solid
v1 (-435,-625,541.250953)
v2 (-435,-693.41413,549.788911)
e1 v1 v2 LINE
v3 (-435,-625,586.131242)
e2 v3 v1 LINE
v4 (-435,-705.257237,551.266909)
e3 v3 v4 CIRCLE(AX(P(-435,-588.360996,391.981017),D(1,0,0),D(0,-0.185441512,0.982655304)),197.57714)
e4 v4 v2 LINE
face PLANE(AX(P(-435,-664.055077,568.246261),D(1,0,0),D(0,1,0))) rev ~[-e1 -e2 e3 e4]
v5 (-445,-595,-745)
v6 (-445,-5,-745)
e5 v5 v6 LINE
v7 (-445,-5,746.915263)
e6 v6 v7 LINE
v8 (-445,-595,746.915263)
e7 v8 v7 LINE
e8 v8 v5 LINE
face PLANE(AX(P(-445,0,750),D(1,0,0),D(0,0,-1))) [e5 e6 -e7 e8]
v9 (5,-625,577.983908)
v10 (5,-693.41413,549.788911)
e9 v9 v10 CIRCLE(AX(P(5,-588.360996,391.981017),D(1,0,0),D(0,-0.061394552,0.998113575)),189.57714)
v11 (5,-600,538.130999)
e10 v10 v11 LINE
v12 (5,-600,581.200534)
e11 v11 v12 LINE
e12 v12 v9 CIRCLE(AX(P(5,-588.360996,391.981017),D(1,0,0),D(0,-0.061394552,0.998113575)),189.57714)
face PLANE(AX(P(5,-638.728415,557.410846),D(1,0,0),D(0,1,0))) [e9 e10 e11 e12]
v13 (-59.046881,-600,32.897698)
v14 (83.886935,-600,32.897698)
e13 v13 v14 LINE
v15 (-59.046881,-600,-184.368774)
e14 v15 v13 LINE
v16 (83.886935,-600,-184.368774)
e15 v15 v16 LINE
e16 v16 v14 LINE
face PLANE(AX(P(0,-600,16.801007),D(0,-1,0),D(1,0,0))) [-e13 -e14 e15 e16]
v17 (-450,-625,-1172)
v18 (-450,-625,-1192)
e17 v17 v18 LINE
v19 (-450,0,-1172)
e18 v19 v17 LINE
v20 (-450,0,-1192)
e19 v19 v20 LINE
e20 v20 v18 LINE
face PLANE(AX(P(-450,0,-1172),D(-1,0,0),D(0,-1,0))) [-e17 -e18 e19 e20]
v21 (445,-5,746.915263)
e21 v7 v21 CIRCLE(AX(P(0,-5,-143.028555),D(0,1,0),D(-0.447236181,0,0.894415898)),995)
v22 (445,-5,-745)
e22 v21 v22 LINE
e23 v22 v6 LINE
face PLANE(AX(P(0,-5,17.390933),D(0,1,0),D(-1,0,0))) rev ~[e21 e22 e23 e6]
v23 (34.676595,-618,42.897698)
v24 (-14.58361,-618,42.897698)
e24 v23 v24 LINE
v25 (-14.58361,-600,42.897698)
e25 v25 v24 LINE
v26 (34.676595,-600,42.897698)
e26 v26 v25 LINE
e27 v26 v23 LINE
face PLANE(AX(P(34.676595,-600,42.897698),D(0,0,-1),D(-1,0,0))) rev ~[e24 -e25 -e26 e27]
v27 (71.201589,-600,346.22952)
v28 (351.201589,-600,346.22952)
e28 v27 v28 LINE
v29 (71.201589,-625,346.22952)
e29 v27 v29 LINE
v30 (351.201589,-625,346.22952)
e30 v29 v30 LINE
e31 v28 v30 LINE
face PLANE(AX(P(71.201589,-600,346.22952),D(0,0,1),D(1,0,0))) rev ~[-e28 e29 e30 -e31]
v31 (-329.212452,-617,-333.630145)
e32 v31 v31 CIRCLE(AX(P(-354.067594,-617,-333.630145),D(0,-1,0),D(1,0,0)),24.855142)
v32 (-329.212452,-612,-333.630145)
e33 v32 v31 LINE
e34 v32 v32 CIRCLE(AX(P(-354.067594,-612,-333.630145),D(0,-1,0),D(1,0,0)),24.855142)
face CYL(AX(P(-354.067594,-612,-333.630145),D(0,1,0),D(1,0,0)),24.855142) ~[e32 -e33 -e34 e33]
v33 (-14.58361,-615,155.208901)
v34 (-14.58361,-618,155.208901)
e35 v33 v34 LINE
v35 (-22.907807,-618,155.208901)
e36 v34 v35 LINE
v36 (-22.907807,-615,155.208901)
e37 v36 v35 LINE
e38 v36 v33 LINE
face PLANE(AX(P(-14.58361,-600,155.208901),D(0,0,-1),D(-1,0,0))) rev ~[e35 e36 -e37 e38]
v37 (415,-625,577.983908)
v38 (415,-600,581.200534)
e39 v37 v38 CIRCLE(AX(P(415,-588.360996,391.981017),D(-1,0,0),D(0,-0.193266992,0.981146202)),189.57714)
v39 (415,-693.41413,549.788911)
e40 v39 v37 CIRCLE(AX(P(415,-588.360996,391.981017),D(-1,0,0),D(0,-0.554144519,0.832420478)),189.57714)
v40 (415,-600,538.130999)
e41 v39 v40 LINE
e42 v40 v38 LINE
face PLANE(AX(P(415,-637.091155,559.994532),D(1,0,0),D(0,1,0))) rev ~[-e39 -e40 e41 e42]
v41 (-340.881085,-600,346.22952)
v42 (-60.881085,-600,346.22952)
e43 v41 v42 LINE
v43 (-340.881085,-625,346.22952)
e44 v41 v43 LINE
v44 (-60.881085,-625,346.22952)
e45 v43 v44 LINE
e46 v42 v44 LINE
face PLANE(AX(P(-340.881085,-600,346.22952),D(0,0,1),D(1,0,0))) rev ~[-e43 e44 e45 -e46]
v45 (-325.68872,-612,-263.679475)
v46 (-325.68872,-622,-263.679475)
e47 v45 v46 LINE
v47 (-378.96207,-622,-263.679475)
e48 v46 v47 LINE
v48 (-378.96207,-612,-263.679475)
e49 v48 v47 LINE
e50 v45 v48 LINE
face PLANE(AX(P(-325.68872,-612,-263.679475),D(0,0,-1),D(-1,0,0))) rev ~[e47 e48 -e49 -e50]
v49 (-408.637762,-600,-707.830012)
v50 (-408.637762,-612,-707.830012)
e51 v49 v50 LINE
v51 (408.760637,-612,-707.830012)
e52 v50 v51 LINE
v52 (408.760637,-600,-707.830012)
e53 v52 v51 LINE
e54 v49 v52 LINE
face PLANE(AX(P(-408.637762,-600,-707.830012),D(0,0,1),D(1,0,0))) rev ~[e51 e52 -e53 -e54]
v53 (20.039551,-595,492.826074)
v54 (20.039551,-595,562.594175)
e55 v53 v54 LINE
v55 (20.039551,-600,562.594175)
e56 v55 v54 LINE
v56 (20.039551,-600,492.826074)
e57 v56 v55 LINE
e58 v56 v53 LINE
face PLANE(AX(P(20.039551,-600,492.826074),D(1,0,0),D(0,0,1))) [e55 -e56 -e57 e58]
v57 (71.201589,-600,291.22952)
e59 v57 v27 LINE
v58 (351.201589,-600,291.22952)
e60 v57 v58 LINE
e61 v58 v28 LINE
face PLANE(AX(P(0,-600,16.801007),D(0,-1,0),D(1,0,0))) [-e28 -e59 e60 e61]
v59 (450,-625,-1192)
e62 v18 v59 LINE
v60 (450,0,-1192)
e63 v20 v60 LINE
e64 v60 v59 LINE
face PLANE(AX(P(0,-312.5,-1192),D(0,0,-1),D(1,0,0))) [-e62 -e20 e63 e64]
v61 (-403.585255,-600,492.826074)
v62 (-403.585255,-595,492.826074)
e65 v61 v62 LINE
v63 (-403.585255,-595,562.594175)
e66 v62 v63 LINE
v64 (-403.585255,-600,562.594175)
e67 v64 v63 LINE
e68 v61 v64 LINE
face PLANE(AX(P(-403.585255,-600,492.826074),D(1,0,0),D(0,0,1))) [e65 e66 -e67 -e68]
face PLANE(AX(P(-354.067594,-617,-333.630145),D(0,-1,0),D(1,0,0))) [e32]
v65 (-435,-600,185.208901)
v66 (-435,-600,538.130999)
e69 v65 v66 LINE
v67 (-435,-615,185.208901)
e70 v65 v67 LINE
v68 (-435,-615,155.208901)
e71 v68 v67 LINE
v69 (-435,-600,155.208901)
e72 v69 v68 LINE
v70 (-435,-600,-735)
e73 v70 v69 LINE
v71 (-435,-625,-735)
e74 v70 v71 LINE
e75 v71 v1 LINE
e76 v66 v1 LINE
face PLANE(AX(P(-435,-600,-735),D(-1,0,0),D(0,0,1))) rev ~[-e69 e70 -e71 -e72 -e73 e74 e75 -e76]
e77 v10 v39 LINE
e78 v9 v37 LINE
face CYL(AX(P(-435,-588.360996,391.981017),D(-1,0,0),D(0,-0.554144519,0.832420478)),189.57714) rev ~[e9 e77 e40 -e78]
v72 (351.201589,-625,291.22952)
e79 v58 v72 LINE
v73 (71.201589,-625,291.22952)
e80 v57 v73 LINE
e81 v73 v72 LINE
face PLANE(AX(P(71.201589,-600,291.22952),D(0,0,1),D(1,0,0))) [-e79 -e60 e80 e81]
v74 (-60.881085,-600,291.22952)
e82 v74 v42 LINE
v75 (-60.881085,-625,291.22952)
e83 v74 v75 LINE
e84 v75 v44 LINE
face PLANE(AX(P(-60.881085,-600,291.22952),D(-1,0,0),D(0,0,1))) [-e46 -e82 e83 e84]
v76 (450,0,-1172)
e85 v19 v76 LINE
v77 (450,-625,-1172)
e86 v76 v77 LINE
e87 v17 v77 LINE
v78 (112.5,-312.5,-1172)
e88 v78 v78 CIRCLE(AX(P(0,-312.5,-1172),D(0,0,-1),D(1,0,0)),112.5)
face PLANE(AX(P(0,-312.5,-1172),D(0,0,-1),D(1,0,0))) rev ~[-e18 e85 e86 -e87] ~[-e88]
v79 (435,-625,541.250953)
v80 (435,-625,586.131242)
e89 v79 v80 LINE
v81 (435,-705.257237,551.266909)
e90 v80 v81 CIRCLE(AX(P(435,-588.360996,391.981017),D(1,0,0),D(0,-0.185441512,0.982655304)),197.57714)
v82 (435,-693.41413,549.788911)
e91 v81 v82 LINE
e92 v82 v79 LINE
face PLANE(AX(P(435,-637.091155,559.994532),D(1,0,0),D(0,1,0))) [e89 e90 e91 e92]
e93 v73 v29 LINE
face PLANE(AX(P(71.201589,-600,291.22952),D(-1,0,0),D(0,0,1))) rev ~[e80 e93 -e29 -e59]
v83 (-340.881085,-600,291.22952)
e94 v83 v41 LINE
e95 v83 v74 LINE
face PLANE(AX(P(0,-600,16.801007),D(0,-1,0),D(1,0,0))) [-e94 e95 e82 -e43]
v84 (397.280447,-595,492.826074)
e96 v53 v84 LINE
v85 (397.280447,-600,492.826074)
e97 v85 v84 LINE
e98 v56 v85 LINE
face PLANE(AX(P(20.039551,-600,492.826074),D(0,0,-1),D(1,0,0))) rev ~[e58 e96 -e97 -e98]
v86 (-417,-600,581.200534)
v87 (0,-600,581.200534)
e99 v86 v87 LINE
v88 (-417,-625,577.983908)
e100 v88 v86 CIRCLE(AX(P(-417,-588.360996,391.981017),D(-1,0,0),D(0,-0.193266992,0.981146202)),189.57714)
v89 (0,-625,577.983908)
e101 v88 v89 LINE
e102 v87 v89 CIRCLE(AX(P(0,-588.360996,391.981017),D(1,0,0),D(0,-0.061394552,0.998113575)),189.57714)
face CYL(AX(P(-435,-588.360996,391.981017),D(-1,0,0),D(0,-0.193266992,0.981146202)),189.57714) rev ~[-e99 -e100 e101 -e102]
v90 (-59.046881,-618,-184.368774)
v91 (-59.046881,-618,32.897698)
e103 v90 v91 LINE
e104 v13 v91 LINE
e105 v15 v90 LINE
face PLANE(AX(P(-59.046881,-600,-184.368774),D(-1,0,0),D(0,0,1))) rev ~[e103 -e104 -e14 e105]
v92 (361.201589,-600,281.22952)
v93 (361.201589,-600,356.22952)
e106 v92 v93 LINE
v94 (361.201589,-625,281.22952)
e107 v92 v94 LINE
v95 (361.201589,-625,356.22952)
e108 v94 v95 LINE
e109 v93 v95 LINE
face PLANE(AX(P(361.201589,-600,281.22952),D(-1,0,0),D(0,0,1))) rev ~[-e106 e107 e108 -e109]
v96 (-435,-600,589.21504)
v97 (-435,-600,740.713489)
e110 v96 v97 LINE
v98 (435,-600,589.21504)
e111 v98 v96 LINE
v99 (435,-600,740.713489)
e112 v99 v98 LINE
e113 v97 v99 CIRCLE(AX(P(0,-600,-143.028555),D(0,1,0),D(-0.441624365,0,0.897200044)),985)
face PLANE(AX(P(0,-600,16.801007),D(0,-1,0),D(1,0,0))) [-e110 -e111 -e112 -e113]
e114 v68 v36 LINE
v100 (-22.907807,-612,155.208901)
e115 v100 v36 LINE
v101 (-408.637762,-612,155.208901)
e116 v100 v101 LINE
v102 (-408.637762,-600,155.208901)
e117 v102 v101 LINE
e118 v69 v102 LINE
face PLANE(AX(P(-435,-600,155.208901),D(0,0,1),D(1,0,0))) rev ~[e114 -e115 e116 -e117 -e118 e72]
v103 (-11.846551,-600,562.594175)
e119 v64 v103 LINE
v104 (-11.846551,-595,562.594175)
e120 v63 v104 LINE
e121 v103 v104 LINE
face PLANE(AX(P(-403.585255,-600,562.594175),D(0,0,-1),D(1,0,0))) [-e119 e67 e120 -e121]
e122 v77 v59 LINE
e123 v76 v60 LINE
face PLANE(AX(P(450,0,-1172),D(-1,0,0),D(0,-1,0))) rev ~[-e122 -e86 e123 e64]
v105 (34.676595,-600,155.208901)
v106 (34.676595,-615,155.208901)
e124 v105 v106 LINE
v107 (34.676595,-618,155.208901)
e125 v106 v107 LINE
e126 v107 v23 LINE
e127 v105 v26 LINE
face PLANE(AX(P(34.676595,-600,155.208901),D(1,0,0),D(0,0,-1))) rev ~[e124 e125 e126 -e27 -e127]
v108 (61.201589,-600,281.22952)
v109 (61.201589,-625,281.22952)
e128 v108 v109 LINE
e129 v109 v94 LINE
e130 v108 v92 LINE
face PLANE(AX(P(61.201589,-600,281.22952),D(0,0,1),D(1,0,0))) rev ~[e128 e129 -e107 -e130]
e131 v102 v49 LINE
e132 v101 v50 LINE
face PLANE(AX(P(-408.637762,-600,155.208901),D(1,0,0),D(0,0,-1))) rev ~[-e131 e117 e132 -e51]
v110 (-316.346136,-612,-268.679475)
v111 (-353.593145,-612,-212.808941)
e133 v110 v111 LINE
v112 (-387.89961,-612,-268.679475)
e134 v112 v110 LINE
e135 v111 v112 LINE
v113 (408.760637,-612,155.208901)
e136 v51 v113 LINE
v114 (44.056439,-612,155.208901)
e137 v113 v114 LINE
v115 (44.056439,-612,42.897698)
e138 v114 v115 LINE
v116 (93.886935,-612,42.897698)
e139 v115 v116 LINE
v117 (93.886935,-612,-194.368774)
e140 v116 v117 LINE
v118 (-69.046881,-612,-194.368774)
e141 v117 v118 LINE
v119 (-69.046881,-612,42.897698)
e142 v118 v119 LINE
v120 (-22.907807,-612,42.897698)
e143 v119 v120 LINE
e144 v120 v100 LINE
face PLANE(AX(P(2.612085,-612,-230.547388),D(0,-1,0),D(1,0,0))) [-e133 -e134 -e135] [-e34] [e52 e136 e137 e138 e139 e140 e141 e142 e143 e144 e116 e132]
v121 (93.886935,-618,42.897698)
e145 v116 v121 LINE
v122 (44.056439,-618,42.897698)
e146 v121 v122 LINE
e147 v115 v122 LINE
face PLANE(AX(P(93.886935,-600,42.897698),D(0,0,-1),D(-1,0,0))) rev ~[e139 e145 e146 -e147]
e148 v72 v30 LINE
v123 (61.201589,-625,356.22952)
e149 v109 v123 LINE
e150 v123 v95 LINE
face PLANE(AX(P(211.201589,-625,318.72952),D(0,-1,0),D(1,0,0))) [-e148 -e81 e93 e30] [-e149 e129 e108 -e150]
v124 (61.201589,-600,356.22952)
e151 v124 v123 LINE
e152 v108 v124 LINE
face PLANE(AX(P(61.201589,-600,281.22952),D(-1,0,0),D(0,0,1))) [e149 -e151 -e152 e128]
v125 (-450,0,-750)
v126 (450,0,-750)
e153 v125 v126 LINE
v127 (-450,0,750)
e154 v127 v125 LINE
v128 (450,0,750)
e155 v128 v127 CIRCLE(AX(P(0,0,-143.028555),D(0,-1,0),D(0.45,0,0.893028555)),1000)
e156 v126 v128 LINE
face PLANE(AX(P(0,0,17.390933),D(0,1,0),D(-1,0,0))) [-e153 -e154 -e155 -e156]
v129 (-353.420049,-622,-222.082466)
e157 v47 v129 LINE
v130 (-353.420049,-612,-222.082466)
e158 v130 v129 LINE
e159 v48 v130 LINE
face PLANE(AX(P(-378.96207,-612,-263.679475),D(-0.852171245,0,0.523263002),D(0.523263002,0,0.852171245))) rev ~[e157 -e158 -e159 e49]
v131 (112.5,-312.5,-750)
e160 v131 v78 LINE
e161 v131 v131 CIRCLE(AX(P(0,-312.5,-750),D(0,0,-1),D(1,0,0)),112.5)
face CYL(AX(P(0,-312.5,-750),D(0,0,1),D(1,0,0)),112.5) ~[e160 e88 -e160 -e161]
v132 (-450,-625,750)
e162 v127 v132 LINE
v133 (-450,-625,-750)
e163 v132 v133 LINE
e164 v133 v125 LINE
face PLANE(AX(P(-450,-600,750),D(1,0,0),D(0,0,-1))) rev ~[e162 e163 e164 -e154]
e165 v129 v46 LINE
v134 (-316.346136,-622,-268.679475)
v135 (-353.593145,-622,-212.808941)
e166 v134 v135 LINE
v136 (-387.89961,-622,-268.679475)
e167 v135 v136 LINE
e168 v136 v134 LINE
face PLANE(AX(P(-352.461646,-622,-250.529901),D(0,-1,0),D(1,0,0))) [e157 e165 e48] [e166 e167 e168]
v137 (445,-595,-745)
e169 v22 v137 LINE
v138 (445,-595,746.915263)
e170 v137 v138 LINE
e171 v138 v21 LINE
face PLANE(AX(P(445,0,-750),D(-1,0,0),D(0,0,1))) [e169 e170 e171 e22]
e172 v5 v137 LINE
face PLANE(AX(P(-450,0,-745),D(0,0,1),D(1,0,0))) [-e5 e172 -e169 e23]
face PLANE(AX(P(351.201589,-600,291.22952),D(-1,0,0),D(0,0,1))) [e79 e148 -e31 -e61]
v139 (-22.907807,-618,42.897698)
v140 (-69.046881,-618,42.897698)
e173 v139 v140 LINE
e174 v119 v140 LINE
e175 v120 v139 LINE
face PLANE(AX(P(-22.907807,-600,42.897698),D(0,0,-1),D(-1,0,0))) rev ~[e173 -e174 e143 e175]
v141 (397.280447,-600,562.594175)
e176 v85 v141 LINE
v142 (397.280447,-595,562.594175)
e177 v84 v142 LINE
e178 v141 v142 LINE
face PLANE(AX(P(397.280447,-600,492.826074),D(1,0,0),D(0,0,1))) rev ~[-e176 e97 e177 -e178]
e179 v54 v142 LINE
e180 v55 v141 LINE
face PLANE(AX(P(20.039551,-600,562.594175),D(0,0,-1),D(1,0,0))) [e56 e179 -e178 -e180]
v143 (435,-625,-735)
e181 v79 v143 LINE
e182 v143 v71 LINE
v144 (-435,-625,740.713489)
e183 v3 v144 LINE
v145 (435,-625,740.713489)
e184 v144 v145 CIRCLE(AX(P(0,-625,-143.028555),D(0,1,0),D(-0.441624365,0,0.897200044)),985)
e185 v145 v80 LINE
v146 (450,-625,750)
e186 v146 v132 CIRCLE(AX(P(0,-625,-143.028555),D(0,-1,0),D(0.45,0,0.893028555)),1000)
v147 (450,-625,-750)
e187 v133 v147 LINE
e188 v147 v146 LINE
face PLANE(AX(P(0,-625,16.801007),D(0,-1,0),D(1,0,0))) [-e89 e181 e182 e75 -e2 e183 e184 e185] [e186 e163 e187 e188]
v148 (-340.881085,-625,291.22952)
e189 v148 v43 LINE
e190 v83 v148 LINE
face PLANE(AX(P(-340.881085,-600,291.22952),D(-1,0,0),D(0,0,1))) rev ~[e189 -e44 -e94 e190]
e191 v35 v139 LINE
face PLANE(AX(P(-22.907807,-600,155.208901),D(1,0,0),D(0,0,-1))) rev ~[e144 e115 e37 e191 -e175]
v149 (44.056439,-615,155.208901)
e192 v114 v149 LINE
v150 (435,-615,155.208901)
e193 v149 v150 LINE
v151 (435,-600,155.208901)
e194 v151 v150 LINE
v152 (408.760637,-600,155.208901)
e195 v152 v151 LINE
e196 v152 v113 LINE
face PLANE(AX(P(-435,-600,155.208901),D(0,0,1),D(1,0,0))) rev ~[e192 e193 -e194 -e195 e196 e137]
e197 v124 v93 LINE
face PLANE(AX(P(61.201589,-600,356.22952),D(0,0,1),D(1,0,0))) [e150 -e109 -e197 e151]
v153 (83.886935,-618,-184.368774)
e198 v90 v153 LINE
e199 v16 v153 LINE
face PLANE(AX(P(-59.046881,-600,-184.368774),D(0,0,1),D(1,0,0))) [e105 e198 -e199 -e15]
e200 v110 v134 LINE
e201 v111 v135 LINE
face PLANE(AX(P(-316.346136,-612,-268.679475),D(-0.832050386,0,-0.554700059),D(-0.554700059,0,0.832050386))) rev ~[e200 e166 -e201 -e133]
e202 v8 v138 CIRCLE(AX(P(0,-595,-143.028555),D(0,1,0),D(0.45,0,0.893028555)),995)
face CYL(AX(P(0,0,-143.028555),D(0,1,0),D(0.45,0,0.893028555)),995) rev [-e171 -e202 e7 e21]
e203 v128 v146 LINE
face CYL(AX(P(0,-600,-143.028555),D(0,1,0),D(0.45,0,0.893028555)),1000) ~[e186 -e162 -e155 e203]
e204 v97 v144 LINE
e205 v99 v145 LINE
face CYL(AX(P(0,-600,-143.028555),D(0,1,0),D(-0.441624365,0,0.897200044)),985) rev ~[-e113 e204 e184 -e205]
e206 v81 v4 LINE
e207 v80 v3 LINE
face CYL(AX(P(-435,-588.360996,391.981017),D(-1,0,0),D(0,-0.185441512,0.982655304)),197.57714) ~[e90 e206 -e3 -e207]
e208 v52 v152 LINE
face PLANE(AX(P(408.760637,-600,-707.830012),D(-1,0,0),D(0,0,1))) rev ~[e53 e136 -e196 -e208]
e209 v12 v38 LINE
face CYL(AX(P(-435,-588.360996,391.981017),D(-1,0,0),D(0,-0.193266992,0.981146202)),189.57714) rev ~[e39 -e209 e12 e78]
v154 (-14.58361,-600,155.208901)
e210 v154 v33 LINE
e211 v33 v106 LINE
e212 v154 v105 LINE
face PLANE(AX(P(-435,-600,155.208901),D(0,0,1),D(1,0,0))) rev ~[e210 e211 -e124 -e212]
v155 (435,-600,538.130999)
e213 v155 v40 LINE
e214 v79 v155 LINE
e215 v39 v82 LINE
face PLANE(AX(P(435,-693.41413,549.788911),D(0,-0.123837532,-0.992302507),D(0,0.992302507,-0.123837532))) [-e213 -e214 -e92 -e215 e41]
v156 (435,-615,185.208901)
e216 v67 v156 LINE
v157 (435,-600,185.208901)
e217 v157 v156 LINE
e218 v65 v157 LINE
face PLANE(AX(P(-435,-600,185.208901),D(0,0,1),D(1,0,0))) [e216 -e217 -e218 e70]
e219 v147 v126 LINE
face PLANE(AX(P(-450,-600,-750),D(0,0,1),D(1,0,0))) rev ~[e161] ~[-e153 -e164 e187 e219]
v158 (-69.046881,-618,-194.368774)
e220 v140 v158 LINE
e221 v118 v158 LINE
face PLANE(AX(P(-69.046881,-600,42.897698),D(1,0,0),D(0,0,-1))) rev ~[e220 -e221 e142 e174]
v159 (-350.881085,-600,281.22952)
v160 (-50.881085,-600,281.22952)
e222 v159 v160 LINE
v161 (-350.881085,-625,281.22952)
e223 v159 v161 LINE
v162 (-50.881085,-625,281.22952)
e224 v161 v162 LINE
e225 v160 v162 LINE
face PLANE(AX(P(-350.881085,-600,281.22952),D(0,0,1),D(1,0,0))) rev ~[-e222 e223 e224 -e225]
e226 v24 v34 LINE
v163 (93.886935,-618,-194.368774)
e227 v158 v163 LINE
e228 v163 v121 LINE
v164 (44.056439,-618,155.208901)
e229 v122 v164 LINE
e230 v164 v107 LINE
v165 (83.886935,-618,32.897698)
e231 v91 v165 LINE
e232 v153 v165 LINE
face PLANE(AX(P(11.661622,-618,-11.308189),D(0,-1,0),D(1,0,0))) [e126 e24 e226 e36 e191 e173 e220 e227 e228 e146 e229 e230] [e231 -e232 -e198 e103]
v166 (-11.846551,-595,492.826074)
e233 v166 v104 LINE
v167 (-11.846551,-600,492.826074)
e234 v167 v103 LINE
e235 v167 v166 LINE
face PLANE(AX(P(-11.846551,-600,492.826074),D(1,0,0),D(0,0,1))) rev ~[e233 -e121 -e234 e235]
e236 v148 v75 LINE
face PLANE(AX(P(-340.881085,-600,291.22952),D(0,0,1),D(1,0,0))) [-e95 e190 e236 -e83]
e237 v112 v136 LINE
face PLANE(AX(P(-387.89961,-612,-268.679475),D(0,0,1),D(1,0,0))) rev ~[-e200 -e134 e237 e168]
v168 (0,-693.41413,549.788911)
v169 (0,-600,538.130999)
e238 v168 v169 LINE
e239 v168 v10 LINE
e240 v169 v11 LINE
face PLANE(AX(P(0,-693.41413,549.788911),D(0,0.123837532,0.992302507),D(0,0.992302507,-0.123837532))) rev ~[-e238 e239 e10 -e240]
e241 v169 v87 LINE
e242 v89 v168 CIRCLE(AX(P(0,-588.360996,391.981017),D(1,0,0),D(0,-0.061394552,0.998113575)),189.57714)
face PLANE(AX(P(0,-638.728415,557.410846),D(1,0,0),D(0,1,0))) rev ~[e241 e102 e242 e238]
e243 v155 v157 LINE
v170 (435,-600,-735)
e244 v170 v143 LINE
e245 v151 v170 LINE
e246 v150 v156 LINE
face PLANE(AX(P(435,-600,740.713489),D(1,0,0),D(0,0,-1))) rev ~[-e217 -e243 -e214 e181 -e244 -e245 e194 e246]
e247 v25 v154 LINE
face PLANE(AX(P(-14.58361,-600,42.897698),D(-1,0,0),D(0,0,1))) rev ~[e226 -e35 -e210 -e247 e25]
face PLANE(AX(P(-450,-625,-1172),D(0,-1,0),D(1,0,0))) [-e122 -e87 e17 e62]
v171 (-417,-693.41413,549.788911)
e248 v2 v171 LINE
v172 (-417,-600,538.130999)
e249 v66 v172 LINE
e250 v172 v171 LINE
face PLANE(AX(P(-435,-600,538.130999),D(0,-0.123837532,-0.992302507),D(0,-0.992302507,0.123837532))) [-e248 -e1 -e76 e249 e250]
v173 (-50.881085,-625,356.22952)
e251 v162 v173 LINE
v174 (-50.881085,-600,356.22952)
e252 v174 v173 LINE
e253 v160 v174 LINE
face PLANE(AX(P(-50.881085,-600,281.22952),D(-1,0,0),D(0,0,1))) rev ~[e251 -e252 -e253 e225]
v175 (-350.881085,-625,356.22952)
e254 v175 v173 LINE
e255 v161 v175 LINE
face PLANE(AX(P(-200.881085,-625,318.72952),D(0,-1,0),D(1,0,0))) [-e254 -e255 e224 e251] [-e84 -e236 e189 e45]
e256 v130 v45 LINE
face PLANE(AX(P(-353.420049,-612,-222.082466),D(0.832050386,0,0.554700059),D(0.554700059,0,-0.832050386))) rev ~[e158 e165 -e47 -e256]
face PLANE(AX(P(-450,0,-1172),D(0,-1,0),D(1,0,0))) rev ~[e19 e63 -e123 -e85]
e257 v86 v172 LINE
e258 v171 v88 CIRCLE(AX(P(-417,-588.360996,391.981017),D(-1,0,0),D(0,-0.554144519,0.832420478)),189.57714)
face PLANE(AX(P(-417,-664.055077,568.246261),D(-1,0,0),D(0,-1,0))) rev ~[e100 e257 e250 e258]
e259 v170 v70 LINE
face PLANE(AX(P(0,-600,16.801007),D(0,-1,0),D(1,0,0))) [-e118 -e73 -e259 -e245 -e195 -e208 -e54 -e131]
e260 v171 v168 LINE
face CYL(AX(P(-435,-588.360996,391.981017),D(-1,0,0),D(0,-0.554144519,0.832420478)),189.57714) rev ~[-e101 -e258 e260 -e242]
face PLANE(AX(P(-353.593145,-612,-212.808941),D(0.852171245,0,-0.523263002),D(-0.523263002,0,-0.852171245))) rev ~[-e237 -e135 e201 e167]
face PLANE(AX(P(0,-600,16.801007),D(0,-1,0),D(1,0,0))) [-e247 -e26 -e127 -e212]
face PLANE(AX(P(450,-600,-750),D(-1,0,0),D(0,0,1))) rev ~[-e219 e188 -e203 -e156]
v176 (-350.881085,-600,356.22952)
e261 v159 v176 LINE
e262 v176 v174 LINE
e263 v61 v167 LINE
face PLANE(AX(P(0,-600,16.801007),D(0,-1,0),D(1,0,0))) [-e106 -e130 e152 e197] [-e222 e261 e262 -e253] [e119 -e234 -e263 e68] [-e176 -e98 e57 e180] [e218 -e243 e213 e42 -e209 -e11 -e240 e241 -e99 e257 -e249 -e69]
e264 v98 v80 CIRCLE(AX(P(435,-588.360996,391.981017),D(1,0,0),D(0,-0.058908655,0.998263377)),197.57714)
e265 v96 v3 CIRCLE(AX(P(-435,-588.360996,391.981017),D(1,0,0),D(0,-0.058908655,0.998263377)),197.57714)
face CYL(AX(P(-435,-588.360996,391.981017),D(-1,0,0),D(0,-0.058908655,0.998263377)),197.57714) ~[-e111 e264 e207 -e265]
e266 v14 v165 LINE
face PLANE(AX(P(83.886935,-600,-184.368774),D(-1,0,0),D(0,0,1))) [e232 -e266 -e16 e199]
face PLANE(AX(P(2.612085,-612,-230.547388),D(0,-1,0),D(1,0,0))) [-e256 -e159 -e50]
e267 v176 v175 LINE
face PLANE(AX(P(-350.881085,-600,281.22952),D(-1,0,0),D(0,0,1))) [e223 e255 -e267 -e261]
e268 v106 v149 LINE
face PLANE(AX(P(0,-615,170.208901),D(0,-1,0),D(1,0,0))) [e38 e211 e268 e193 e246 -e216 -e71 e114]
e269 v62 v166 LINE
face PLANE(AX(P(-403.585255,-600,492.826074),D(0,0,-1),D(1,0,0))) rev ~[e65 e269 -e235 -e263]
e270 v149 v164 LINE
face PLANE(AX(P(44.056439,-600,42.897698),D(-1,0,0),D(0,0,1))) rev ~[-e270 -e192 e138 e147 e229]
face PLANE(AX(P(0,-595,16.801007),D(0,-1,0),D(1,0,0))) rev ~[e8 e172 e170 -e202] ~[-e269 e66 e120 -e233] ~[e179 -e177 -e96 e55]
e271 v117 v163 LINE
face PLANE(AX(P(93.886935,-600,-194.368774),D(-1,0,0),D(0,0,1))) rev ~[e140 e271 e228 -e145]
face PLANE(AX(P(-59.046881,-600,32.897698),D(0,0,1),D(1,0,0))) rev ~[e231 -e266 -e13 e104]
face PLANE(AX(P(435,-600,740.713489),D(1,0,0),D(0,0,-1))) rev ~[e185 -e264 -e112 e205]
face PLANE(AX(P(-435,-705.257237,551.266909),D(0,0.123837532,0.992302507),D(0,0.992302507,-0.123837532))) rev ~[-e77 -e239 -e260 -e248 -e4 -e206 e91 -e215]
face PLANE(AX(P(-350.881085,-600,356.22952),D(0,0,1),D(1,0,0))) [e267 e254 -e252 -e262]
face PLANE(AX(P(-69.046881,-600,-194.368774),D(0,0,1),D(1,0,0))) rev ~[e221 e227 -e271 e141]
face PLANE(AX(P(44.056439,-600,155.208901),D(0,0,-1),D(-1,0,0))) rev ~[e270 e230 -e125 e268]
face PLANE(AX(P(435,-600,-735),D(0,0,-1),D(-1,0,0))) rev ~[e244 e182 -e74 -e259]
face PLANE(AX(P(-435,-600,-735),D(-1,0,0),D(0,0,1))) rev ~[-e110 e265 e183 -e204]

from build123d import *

# Parameters (mm, degrees)
F1_DEPTH  = 600
F2_T      = -5
F4_DEPTH  = 25
F5_W      = 300
F5_H      = 75
F5_W_2    = 280
F5_H_2    = 55
F6_DEPTH  = 25
F7_W      = 870
F7_H      = 30
F8_DEPTH  = 15
F9_W      = 142.9338163137
F9_H      = 217.2664716095
F10_DEPTH = 18
F12_DEPTH = 12
F13_R     = 24.8551421214
F14_DEPTH = 5
F16_DEPTH = 10
F18_DEPTH = 870
F20_DEPTH = 20
F22_DEPTH = 18
F25_DEPTH = 5
F27_DEPTH = 5
F28_W     = 391.7387041664
F28_H     = 69.7681009769
F28_W_2   = 377.2408955904
F29_DEPTH = 25
F30_R     = 112.5
F31_DEPTH = 422
F32_W     = 900
F32_H     = 625
F32_R     = 112.5
F33_DEPTH = 20


with BuildPart() as f1:
    # F0 (on Front) → F1 (new body)
    with BuildSketch(Plane.XZ):
        with BuildLine():
            Line((-450, -750), (450, -750))
            Line((450, -750), (450, 750))
            ThreePointArc((450, 750), (0, 856.9714450254), (-450, 750))
            Line((-450, 750), (-450, -750))
        make_face()
    extrude(amount=F1_DEPTH)

    # F2
    f2_openings = [f1.faces().sort_by_distance(p)[0] for p in [
        (0, 0, 36.375009),
    ]]
    offset(amount=F2_T, openings=f2_openings)

    # F3 (on face) → F4 (join)
    with BuildSketch(Plane.XZ.offset(600)):
        with BuildLine():
            Line((450, -750), (450, 750))
            ThreePointArc((450, 750), (0, 856.9714450254), (-450, 750))
            Line((-450, 750), (-450, -750))
            Line((-450, -750), (450, -750))
        make_face()
        with BuildLine():
            Line((435, 740.7134888368), (435, -735))
            Line((435, -735), (-435, -735))
            Line((-435, -735), (-435, 740.7134888368))
            ThreePointArc((-435, 740.7134888368), (0, 841.9714450254), (435, 740.7134888368))
        make_face(mode=Mode.SUBTRACT)
    extrude(amount=F4_DEPTH)

    # F5 (on face) → F6 (join)
    with BuildSketch(Plane.XZ.offset(600)):
        with Locations((-200.8810852704, 318.7295198674)):
            Rectangle(F5_W, F5_H)
        with Locations((-200.8810852704, 318.7295198674)):
            Rectangle(F5_W_2, F5_H_2, mode=Mode.SUBTRACT)
        with Locations((211.2015885351, 318.7295198674)):
            Rectangle(F5_W, F5_H)
        with Locations((211.2015885351, 318.7295198674)):
            Rectangle(F5_W_2, F5_H_2, mode=Mode.SUBTRACT)
    extrude(amount=F6_DEPTH)

    # F7 (on face) → F8 (join)
    with BuildSketch(Plane.XZ.offset(600)):
        with Locations((0, 170.2089005709)):
            Rectangle(F7_W, F7_H)
    extrude(amount=F8_DEPTH)

    # F9 (on face) → F10 (join)
    with BuildSketch(Plane.XZ.offset(600)):
        Polygon((-14.5836101339, 155.2089005709), (-22.9078065604, 155.2089005709), (-22.9078065604, 42.8976975381), (-69.0468810499, 42.8976975381), (-69.0468810499, -194.3687740713), (93.8869352639, -194.3687740713), (93.8869352639, 42.8976975381), (44.0564386487, 42.8976975381), (44.0564386487, 155.2089005709), (34.6765947954, 155.2089005709), (34.6765947954, 42.8976975381), (-14.5836101339, 42.8976975381), align=None)
        with Locations((12.420027107, -75.7355382666)):
            Rectangle(F9_W, F9_H, mode=Mode.SUBTRACT)
    extrude(amount=F10_DEPTH)

    # F11 (on face) → F12 (join)
    with BuildSketch(Plane.XZ.offset(600)):
        Polygon((-22.9078065604, 155.2089005709), (-408.6377620697, 155.2089005709), (-408.6377620697, -707.8300118446), (408.7606370449, -707.8300118446), (408.7606370449, 155.2089005709), (44.0564386487, 155.2089005709), (44.0564386487, 42.8976975381), (93.8869352639, 42.8976975381), (93.8869352639, -194.3687740713), (-69.0468810499, -194.3687740713), (-69.0468810499, 42.8976975381), (-22.9078065604, 42.8976975381), align=None)
    extrude(amount=F12_DEPTH)

    # F13 (on face) → F14 (join)
    with BuildSketch(Plane.XZ.offset(612)):
        with Locations((-354.0675938129, -333.6301445961)):
            Circle(F13_R)
    extrude(amount=F14_DEPTH)

    # F15 (on face) → F16 (join)
    with BuildSketch(Plane.XZ.offset(612)):
        Polygon((-387.899610247, -268.6794745922), (-316.3461361468, -268.6794745922), (-353.5931451269, -212.8089411077), align=None)
        Polygon((-378.9620697498, -263.6794745922), (-353.4200489521, -222.0824658871), (-325.6887197495, -263.6794745922), align=None, mode=Mode.SUBTRACT)
    extrude(amount=F16_DEPTH)

    # F17 (on face) → F18 (join, through all)
    with BuildSketch(Plane.YZ.offset(-435)):
        with BuildLine():
            Line((-625, 577.9839080805), (-625, 586.1312416531))
            ThreePointArc((-625, 586.1312416531), (-667.0829642918, 573.1979535583), (-705.2572369576, 551.2669086456))
            Line((-705.2572369576, 551.2669086456), (-693.4141296704, 549.7889105873))
            ThreePointArc((-693.4141296704, 549.7889105873), (-660.5960632562, 567.2567631744), (-625, 577.9839080805))
        make_face()
        with BuildLine():
            Line((-600, 581.2005341429), (-600, 589.2150402069))
            ThreePointArc((-600, 589.2150402069), (-612.5491949312, 588.0719585758), (-625, 586.1312416531))
            Line((-625, 586.1312416531), (-625, 577.9839080805))
            ThreePointArc((-625, 577.9839080805), (-612.5535193278, 580.008179687), (-600, 581.2005341429))
        make_face()
    extrude(amount=F18_DEPTH)

    # F19 (on face) → F20 (join)
    with BuildSketch(Plane.YZ.offset(435)):
        with BuildLine():
            ThreePointArc((-625, 577.9839080805), (-660.5960632562, 567.2567631744), (-693.4141296704, 549.7889105873))
            Line((-693.4141296704, 549.7889105873), (-600, 538.1309986115))
            Line((-600, 538.1309986115), (-600, 589.2150402069))
            ThreePointArc((-600, 589.2150402069), (-612.5491949312, 588.0719585758), (-625, 586.1312416531))
            Line((-625, 586.1312416531), (-625, 577.9839080805))
        make_face()
        with BuildLine():
            ThreePointArc((-625, 586.1312416531), (-667.0829642918, 573.1979535583), (-705.2572369576, 551.2669086456))
            Line((-705.2572369576, 551.2669086456), (-693.4141296704, 549.7889105873))
            ThreePointArc((-693.4141296704, 549.7889105873), (-660.5960632562, 567.2567631744), (-625, 577.9839080805))
            Line((-625, 577.9839080805), (-625, 586.1312416531))
        make_face()
    extrude(amount=-F20_DEPTH)

    # F21 (on face) → F22 (join)
    with BuildSketch(Plane(origin=(-435, 0, 0), x_dir=(0, -1, 0), z_dir=(-1, 0, 0))):
        with BuildLine():
            ThreePointArc((625, 577.9839080805), (660.5960632562, 567.2567631744), (693.4141296704, 549.7889105873))
            Line((693.4141296704, 549.7889105873), (705.2572369576, 551.2669086456))
            ThreePointArc((705.2572369576, 551.2669086456), (667.0829642918, 573.1979535583), (625, 586.1312416531))
            Line((625, 586.1312416531), (625, 577.9839080805))
        make_face()
        with BuildLine():
            Line((600, 589.2150402069), (600, 581.2005341429))
            Line((600, 581.2005341429), (600, 538.1309986115))
            Line((600, 538.1309986115), (693.4141296704, 549.7889105873))
            ThreePointArc((693.4141296704, 549.7889105873), (660.5960632562, 567.2567631744), (625, 577.9839080805))
            Line((625, 577.9839080805), (625, 586.1312416531))
            ThreePointArc((625, 586.1312416531), (612.5491949312, 588.0719585758), (600, 589.2150402069))
        make_face()
    extrude(amount=-F22_DEPTH)

    # F24 (on offset) → F25 (join)
    with BuildSketch(Plane.YZ):
        with BuildLine():
            Line((-600, 538.1309986115), (-600, 581.2005341429))
            ThreePointArc((-600, 581.2005341429), (-648.7839740291, 571.6711832668), (-693.4141296704, 549.7889105873))
            Line((-693.4141296704, 549.7889105873), (-600, 538.1309986115))
        make_face()
    extrude(amount=F25_DEPTH)

    # F26 (on face) → F27 (join)
    with BuildSketch(Plane(origin=(0, 0, 0), x_dir=(-1, 0, 0), z_dir=(0, 1, 0))):
        with BuildLine():
            ThreePointArc((445, 746.9152634769), (0, 851.9714450254), (-445, 746.9152634769))
            Line((-445, 746.9152634769), (-445, -745))
            Line((-445, -745), (445, -745))
            Line((445, -745), (445, 746.9152634769))
        make_face()
    extrude(amount=-F27_DEPTH)

    # F28 (on face) → F29 (cut)
    with BuildSketch(Plane.XZ.offset(600)):
        with Locations((-207.7159030628, 527.7101248503)):
            Rectangle(F28_W, F28_H)
        with Locations((208.6599989108, 527.7101248503)):
            Rectangle(F28_W_2, F28_H)
    extrude(amount=-F29_DEPTH, mode=Mode.SUBTRACT)

    # F30 (on face) → F31 (join)
    with BuildSketch(Plane(origin=(0, 0, -750), x_dir=(1, 0, 0), z_dir=(0, 0, -1))):
        with Locations((0, 312.5)):
            Circle(F30_R)
    extrude(amount=F31_DEPTH)

    # F32 (on face) → F33 (join)
    with BuildSketch(Plane(origin=(0, 0, -1172), x_dir=(1, 0, 0), z_dir=(0, 0, -1))):
        with Locations((0, 312.5)):
            Rectangle(F32_W, F32_H)
        with Locations((0, 312.5)):
            Circle(F32_R, mode=Mode.SUBTRACT)
        with Locations((0, 312.5)):
            Circle(F32_R)
    extrude(amount=F33_DEPTH)


solid = f1.part
